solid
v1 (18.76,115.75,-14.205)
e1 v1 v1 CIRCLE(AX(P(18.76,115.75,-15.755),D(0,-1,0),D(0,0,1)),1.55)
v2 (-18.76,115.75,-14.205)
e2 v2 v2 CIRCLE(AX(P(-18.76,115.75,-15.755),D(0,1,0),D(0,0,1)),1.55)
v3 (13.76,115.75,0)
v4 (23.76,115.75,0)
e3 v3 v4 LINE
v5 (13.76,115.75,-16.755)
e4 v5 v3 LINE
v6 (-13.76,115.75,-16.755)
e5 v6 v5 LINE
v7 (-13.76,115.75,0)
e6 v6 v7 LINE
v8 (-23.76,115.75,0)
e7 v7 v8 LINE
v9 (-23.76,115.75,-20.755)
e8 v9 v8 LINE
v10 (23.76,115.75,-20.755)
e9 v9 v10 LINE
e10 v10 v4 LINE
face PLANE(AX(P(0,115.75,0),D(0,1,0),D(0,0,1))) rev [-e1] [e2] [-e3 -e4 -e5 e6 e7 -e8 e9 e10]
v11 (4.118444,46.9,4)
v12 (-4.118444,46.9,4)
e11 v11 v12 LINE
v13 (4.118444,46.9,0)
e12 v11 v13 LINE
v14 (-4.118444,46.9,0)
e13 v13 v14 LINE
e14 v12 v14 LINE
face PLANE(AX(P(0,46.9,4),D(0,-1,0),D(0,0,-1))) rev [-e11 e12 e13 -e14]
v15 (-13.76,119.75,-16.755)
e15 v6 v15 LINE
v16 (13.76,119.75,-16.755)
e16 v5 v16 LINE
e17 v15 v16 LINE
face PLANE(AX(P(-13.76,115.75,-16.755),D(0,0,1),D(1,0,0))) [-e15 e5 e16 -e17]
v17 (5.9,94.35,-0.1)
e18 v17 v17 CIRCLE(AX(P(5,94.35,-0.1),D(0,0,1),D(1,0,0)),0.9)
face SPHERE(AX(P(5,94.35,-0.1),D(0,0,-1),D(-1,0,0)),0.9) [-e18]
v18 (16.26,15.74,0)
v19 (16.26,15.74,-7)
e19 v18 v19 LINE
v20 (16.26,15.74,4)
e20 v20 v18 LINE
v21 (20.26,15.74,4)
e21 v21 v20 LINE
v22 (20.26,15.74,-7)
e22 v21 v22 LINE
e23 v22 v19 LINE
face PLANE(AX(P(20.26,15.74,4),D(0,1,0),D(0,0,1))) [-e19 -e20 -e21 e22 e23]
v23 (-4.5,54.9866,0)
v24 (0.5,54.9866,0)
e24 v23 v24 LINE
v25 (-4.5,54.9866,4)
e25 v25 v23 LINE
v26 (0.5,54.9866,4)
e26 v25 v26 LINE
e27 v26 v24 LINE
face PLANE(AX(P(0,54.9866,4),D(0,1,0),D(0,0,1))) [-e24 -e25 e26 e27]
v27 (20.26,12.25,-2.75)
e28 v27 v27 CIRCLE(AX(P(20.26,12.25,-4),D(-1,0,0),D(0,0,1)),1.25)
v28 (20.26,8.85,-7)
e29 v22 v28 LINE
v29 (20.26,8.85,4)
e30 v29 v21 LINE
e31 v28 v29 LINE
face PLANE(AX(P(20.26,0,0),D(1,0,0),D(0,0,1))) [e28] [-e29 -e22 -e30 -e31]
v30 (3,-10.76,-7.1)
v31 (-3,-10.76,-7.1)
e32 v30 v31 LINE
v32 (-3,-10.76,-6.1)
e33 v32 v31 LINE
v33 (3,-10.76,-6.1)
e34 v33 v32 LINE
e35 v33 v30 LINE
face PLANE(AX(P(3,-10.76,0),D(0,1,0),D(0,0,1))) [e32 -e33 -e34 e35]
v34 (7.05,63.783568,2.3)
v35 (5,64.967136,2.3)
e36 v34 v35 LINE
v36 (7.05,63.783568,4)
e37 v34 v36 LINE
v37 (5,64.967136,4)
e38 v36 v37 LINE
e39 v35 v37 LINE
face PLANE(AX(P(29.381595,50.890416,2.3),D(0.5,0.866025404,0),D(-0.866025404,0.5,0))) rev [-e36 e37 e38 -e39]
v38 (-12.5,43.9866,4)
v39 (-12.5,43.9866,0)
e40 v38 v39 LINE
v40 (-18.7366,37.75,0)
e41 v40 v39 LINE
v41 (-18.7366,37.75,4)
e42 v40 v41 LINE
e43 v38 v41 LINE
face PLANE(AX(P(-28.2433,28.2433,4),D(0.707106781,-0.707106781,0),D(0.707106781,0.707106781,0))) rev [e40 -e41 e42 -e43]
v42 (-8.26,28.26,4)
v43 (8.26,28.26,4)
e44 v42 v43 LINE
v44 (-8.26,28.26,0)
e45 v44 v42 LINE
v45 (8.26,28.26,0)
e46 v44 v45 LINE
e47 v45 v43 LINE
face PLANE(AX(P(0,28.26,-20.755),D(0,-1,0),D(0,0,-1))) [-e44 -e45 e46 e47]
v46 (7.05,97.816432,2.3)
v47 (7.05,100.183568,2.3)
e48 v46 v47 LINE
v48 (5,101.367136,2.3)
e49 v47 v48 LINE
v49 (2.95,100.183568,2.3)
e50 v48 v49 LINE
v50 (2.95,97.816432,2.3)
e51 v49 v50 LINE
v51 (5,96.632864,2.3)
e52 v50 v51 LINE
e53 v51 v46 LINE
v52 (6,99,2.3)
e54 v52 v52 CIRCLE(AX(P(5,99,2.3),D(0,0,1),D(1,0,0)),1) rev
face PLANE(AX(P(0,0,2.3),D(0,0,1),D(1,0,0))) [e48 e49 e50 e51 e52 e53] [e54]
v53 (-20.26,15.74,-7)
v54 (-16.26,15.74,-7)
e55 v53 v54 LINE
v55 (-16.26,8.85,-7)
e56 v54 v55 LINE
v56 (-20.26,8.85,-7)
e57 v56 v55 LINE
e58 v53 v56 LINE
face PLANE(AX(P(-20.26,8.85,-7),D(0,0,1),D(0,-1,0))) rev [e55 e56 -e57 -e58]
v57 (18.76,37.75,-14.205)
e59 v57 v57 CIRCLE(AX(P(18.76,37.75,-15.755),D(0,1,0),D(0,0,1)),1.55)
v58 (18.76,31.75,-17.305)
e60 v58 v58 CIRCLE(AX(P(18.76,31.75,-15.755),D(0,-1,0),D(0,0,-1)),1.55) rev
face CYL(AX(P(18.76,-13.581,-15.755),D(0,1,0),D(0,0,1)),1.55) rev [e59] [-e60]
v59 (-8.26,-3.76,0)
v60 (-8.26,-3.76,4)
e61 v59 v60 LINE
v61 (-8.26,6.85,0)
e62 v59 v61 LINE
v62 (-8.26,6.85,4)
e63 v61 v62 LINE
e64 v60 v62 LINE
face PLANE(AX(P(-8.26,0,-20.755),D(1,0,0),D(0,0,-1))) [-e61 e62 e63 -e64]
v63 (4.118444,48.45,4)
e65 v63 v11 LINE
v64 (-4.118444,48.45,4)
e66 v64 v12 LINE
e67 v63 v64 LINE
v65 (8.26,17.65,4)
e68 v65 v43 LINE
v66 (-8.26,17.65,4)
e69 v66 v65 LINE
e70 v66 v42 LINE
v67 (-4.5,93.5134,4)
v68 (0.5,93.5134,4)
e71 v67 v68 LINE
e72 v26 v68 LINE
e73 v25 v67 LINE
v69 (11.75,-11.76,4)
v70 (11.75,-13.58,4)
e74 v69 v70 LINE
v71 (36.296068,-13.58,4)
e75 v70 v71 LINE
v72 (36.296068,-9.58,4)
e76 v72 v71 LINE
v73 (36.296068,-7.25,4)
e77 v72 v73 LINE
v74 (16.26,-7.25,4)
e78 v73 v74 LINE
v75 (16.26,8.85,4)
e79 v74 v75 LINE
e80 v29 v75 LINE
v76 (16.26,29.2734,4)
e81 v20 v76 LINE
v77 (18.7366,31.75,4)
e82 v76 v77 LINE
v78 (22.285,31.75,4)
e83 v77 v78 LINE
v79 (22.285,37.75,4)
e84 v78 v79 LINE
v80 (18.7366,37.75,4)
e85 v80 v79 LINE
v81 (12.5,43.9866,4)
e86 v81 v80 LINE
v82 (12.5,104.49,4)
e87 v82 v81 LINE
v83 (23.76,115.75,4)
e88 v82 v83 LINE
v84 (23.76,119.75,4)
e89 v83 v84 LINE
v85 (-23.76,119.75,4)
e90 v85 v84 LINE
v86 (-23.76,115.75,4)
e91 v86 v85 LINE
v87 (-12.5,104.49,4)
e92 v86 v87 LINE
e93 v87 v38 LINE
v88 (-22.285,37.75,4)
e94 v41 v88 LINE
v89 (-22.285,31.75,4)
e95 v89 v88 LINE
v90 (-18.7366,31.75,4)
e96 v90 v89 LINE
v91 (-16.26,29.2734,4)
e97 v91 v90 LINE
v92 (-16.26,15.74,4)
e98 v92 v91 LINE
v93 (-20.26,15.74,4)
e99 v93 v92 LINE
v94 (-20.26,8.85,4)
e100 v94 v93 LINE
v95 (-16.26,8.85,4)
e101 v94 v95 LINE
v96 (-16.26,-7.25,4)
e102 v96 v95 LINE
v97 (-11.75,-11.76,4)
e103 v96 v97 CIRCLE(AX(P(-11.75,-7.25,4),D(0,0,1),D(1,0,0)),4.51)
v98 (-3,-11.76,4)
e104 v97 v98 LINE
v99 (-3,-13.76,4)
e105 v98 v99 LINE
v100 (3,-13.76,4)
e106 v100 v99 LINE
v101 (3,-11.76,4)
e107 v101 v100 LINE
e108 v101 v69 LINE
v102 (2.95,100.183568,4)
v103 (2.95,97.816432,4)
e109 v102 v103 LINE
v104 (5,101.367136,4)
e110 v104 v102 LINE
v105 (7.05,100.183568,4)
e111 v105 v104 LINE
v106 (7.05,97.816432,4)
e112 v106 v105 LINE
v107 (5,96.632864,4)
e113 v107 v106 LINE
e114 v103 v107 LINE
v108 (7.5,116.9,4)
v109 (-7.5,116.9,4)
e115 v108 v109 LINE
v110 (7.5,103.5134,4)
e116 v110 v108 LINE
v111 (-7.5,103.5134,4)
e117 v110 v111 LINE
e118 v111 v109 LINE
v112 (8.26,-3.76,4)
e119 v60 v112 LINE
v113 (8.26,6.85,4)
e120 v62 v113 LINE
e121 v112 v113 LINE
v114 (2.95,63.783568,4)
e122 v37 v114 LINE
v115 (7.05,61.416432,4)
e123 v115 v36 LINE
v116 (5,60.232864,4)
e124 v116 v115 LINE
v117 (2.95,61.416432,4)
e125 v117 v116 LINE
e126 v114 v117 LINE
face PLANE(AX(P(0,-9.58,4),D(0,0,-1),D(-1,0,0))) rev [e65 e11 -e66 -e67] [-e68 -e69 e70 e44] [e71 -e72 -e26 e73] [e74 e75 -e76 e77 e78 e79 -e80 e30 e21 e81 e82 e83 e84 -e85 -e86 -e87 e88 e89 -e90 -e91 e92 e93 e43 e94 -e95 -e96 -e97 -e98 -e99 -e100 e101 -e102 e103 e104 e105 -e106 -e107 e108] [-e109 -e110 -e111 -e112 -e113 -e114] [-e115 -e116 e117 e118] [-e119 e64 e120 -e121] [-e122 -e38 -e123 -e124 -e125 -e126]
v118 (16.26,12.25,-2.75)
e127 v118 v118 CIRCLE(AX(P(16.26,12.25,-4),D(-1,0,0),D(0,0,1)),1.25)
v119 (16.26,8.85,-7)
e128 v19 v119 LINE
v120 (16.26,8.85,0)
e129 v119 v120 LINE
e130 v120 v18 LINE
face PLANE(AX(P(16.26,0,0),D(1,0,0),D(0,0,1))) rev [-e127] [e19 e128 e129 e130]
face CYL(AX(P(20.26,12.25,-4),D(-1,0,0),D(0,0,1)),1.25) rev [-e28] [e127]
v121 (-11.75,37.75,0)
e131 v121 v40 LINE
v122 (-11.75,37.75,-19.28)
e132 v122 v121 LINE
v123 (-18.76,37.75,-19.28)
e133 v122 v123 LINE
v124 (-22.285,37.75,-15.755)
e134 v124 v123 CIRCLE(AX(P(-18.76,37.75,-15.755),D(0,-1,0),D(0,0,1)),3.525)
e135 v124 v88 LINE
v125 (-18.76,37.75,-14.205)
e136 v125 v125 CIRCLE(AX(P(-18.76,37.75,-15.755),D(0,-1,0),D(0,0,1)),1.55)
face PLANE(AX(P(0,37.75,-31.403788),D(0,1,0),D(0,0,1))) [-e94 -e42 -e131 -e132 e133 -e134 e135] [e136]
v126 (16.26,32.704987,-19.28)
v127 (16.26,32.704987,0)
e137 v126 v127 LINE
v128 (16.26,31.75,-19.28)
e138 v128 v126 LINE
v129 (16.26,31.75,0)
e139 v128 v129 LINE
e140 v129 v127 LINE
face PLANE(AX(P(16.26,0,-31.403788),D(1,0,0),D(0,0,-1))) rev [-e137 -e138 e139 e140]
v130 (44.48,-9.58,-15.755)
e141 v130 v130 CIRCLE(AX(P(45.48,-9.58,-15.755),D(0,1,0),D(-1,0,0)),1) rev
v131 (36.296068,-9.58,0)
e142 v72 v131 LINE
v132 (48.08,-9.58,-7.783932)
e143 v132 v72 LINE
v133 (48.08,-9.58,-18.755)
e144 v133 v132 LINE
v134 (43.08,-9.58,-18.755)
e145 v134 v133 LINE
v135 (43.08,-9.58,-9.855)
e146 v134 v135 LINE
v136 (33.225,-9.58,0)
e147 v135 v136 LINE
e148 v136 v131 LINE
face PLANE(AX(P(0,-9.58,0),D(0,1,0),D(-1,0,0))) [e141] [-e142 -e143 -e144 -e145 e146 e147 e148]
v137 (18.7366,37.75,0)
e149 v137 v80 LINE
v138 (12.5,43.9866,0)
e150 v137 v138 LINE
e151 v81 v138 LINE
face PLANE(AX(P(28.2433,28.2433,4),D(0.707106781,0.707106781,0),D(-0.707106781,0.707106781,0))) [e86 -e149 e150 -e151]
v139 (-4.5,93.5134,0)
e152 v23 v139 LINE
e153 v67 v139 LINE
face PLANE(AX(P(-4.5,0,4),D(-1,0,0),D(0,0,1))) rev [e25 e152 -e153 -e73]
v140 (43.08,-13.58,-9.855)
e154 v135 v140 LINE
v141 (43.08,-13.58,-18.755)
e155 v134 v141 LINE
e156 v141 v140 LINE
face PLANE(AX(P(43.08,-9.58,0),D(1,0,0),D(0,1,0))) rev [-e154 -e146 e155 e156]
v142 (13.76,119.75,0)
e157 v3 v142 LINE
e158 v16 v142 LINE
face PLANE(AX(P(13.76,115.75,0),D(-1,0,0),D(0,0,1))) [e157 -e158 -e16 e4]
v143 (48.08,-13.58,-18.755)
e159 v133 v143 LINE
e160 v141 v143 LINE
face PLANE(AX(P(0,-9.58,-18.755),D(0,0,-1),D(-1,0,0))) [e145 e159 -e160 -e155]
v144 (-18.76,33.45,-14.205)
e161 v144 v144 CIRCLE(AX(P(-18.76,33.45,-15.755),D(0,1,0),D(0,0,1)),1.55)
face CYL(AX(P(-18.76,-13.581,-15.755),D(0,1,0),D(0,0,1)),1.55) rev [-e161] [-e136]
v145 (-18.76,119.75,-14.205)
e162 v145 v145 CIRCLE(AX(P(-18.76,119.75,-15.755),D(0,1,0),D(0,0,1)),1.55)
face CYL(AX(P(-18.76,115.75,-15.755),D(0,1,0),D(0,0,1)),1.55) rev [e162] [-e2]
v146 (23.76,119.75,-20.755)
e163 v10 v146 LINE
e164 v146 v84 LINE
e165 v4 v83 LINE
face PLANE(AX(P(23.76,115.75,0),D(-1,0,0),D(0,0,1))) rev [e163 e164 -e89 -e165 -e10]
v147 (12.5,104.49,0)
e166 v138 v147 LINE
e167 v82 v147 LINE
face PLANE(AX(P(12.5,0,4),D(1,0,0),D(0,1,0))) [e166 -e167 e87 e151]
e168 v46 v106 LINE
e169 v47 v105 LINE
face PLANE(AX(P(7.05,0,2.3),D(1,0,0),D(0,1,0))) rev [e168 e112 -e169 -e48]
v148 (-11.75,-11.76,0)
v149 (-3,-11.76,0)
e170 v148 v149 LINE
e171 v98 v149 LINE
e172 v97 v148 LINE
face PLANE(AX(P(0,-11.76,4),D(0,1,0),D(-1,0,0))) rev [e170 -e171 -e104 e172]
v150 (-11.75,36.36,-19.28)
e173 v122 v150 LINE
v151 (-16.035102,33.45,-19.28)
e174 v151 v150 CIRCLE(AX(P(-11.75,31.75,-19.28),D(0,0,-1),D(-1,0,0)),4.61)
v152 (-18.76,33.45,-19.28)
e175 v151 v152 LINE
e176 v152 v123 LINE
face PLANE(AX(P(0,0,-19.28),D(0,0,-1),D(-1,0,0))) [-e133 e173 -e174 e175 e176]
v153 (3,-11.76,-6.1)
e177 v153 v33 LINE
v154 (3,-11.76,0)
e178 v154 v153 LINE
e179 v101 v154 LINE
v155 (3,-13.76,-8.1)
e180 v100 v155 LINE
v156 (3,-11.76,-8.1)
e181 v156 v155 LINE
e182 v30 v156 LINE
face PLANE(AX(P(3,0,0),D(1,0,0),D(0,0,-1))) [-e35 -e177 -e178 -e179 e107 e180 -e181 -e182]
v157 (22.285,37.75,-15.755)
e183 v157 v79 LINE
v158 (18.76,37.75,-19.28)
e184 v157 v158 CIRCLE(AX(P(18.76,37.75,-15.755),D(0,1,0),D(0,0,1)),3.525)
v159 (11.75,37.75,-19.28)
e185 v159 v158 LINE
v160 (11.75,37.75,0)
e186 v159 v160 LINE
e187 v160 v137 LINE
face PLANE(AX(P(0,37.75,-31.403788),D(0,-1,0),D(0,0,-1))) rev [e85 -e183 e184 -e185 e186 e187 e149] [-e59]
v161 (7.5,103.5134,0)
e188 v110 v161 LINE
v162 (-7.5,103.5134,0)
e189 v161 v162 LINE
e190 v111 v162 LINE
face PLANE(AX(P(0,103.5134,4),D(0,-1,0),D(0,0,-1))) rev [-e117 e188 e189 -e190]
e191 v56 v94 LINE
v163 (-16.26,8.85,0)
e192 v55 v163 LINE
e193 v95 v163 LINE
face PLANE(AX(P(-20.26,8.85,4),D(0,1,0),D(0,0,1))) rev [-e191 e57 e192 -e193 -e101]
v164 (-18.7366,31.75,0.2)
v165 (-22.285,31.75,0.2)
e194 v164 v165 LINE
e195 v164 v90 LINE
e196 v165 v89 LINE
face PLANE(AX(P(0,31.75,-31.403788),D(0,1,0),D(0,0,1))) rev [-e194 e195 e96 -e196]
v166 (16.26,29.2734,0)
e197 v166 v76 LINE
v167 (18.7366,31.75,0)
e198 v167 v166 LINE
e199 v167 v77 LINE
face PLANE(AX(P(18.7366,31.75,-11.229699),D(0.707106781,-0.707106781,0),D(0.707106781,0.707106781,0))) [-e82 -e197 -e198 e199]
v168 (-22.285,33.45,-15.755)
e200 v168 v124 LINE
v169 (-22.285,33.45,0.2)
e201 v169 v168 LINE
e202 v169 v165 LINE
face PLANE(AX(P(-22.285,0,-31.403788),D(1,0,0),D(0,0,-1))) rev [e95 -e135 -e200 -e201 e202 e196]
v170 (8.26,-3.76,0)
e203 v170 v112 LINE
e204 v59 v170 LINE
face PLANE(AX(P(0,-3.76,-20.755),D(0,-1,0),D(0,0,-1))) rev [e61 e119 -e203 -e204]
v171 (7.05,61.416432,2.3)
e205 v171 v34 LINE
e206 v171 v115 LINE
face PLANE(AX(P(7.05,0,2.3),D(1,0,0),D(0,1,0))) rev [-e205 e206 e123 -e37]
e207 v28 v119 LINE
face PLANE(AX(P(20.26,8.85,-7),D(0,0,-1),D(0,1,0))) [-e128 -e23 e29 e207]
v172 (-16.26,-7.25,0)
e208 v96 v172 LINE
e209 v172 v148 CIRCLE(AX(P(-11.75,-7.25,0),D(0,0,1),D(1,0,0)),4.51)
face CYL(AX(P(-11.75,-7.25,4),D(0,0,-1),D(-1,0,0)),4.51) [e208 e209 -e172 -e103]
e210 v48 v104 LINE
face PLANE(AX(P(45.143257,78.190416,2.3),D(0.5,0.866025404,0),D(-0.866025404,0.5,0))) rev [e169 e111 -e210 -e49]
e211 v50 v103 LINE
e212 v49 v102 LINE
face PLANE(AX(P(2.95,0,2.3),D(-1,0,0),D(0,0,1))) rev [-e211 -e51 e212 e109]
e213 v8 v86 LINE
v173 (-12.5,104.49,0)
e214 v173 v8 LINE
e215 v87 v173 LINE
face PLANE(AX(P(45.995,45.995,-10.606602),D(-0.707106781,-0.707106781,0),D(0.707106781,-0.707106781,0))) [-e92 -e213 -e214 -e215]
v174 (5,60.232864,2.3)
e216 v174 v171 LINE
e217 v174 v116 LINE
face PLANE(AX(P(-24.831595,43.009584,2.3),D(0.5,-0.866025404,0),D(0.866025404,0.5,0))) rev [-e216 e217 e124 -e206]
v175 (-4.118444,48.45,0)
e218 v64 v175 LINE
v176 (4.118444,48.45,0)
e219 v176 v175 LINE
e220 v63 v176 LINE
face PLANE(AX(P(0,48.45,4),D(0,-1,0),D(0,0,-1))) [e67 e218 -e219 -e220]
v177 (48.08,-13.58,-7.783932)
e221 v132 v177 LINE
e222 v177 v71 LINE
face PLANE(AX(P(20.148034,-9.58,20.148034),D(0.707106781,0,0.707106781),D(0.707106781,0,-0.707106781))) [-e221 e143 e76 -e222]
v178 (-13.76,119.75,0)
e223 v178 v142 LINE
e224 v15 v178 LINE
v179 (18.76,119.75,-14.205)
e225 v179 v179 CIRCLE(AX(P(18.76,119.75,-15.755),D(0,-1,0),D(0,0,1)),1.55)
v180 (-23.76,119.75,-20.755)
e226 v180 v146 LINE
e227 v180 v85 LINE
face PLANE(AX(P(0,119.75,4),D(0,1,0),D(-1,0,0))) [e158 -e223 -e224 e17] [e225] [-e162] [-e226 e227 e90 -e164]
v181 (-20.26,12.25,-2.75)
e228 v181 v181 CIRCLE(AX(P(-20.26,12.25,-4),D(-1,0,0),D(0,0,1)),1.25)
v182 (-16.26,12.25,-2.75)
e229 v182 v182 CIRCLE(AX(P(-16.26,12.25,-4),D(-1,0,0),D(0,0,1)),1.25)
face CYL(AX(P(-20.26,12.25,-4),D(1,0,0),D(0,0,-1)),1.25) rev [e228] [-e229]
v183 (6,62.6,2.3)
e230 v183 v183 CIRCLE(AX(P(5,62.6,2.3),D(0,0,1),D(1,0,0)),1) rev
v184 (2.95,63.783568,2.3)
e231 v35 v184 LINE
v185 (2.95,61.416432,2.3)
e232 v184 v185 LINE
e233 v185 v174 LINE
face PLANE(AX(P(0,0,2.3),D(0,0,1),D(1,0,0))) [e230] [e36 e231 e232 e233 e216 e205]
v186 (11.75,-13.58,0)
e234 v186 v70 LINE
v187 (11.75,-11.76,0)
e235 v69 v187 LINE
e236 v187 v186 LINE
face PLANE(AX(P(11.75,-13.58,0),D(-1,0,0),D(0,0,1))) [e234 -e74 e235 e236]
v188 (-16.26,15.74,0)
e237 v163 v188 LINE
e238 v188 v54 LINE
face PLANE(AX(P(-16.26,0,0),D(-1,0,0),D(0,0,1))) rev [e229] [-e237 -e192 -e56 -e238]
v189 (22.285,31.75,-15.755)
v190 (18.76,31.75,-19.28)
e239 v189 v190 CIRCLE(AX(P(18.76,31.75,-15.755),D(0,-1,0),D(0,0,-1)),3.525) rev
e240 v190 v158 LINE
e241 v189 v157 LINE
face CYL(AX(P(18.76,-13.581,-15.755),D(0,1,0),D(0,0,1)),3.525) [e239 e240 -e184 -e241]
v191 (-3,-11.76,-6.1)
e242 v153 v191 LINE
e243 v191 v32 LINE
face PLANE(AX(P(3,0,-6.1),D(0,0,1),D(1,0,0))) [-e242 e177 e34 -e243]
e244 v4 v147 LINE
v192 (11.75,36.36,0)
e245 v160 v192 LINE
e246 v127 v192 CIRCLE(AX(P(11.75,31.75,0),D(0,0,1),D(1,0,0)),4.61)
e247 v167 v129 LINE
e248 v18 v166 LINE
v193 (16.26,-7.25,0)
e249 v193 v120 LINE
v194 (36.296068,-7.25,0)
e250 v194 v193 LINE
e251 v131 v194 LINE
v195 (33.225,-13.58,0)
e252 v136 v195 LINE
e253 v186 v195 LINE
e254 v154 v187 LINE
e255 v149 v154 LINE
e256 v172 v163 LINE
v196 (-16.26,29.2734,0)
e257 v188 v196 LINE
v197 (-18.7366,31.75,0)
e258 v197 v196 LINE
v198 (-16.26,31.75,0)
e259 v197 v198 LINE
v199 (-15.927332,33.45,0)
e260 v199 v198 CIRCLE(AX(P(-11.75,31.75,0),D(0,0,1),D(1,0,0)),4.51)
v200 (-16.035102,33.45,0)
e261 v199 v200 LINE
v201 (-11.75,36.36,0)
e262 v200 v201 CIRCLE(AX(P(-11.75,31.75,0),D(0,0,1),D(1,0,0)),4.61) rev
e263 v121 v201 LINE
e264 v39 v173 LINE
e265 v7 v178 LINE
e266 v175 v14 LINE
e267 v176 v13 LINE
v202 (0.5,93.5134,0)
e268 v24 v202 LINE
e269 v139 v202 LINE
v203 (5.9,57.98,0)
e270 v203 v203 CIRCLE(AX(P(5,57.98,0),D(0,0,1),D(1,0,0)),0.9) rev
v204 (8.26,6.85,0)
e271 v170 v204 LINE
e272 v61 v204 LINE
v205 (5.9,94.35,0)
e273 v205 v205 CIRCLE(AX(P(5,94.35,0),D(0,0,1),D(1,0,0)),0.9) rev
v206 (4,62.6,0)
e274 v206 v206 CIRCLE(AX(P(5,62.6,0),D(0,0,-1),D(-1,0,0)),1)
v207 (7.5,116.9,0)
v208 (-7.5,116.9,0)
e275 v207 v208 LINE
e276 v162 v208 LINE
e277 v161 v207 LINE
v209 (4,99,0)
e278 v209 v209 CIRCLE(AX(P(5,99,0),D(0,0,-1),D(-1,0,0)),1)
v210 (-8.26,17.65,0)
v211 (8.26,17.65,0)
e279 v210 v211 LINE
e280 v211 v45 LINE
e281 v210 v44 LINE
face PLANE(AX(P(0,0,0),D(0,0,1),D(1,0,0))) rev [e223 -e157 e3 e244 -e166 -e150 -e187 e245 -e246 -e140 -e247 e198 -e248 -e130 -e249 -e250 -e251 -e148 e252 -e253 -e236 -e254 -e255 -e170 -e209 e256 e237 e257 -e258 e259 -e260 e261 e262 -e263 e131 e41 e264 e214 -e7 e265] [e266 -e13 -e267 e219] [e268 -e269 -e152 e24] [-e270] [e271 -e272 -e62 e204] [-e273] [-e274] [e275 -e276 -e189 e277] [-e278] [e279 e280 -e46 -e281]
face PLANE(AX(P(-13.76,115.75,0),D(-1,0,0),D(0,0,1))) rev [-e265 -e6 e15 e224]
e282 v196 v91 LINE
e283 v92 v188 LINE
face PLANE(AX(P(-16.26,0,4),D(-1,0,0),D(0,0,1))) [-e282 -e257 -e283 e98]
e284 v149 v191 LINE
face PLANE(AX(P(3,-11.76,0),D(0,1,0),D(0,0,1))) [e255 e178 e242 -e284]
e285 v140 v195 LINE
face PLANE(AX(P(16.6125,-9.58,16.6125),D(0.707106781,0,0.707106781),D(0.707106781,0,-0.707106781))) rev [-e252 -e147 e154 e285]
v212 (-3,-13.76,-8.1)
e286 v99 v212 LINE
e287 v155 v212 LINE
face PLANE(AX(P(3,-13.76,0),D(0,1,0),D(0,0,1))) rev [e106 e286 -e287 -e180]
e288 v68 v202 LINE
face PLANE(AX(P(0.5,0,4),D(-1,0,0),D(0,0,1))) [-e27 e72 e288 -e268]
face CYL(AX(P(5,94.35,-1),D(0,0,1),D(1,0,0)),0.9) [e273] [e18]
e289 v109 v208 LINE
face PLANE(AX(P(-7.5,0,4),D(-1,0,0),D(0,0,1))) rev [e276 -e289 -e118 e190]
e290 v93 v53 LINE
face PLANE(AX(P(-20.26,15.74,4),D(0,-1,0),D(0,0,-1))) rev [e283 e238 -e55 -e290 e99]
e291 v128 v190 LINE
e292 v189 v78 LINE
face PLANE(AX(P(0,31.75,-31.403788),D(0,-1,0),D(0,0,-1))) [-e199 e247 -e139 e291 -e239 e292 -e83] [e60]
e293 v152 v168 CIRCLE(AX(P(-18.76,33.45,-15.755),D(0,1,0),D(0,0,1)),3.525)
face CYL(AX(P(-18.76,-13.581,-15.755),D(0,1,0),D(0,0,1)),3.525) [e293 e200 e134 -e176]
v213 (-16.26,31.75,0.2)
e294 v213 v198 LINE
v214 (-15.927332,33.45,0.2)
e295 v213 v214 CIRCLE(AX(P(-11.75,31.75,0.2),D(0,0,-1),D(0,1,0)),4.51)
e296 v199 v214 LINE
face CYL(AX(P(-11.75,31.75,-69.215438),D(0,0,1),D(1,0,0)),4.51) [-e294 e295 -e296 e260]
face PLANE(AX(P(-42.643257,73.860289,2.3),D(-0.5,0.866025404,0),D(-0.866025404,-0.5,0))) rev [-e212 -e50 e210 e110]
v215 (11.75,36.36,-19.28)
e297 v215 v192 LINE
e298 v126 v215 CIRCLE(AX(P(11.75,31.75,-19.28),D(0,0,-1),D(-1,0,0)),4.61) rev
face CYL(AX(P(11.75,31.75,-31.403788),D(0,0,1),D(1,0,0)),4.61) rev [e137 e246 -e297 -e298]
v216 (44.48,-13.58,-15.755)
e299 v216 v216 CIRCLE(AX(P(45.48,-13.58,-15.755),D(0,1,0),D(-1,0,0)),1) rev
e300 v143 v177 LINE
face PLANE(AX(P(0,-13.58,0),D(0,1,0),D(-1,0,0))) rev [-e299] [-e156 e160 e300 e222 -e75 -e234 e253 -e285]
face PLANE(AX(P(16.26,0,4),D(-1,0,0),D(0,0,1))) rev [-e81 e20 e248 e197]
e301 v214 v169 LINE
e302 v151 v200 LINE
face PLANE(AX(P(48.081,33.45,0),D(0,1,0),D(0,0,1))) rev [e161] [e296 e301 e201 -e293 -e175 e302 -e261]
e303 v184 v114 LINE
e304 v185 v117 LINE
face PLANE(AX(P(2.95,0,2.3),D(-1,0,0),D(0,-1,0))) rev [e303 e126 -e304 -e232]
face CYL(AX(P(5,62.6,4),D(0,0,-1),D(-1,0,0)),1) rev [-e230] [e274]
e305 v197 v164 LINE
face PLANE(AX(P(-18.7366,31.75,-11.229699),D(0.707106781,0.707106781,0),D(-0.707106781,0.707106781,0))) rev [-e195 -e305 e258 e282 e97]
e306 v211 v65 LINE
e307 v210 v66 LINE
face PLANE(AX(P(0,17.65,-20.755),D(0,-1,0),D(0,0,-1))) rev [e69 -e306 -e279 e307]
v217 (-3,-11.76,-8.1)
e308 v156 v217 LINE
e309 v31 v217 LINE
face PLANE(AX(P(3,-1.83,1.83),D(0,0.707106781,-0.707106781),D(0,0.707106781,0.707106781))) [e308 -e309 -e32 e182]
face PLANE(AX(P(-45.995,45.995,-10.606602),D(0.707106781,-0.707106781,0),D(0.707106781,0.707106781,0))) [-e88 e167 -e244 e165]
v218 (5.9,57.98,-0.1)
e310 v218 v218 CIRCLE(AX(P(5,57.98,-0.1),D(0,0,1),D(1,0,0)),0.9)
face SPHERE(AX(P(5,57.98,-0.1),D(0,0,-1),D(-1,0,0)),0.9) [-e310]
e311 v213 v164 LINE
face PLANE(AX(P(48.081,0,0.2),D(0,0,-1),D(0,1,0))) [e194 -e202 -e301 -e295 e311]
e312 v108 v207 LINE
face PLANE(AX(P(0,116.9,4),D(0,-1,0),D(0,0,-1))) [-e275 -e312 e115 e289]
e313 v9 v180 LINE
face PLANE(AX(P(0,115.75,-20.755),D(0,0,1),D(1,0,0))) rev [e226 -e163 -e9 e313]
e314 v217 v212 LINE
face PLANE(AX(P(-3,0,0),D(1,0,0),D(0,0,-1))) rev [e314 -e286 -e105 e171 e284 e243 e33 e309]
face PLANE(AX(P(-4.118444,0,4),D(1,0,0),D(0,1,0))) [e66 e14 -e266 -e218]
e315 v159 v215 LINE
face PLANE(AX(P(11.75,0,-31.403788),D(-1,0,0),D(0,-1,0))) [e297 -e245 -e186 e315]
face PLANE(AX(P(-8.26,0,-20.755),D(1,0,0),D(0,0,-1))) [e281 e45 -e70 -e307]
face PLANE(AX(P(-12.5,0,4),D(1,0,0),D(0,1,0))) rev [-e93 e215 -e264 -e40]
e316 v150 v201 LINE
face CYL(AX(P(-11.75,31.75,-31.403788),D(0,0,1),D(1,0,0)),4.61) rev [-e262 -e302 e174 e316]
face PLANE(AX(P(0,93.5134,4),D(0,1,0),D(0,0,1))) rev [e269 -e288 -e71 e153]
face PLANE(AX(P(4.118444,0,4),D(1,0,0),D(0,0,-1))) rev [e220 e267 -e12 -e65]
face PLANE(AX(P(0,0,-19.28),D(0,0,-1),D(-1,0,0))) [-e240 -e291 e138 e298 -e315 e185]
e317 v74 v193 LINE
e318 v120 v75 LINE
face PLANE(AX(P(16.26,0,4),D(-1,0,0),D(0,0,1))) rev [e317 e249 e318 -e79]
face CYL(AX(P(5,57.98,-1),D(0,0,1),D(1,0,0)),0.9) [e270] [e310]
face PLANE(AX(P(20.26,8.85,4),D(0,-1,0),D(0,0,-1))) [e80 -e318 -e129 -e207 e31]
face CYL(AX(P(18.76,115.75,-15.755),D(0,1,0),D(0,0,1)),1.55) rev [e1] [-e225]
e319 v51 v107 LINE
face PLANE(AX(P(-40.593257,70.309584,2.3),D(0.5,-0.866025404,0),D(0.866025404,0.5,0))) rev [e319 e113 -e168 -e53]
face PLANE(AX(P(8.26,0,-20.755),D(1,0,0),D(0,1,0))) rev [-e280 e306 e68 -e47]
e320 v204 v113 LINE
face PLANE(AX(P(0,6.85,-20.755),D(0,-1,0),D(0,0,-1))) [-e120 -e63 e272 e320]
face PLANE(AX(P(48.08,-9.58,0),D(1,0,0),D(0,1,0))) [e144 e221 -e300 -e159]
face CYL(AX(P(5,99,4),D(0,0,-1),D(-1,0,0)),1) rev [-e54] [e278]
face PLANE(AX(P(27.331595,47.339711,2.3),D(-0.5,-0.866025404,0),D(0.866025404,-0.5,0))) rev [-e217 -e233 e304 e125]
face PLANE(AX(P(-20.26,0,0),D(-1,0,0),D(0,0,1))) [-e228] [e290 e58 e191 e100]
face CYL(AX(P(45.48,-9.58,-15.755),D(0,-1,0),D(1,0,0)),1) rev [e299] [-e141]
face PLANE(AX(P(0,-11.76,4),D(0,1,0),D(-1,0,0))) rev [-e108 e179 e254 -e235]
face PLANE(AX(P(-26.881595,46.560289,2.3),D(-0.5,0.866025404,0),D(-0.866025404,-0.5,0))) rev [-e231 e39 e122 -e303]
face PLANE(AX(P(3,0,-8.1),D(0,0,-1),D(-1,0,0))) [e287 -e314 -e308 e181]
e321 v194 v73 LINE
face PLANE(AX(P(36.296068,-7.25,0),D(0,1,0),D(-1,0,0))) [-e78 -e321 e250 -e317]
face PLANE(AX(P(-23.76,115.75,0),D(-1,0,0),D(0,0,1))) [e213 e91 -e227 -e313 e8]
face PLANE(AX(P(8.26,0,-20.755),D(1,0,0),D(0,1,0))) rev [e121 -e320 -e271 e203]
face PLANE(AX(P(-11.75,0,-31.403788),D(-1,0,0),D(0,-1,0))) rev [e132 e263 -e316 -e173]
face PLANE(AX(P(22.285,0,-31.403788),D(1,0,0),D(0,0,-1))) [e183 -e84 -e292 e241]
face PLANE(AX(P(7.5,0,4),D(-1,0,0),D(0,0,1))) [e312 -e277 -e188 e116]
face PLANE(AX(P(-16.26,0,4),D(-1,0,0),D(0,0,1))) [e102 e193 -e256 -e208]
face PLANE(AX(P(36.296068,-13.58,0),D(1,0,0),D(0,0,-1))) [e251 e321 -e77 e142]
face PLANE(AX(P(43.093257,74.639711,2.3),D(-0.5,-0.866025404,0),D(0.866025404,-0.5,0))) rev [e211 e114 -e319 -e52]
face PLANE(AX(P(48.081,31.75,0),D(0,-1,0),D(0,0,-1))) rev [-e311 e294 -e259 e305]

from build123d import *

# Parameters (mm, degrees)
EXTRUDE_1_DEPTH     = 4
SKETCH_2_W          = 15
SKETCH_2_H          = 13.3866
CUT_EXTRUDE_1_DEPTH = 121.91505324
SKETCH_3_W          = 10
SKETCH_3_H          = 10
SKETCH_3_R          = 1.55
SKETCH_3_H_2        = 14.755
EXTRUDE_2_DEPTH     = 4
EXTRUDE_3_DEPTH     = 4
EXTRUDE_4_DEPTH     = 4
SKETCH_7_W          = 27.52
SKETCH_7_H          = 4
EXTRUDE_5_DEPTH     = 4
SKETCH_8_W          = 24.546067812
SKETCH_8_H          = 6.33
EXTRUDE_6_DEPTH     = 4
SKETCH_11_W         = 16.52
SKETCH_11_H         = 10.61
CUT_EXTRUDE_2_DEPTH = 132.394668556
SKETCH_12_W         = 11
SKETCH_12_H         = 6.89
SKETCH_12_R         = 1.25
EXTRUDE_6711_DEPTH  = 4
SKETCH_14_R         = 1
CUT_EXTRUDE_3_DEPTH = 131.700110654
SKETCH_15_R         = 0.9
EXTRUDE_9_DEPTH     = 1
FILLET_1_R          = 0.9
CUT_EXTRUDE_START   = -1.7
SKETCH_16_R         = 1
CUT_EXTRUDE_4_DEPTH = 1.7
CUT_EXTRUDE_5_DEPTH = 131.700110654
SKETCH_19_W         = 5
SKETCH_19_H         = 38.5268
SKETCH_19_W_2       = 8.236887868
SKETCH_19_H_2       = 1.55
CUT_EXTRUDE_6_DEPTH = 131.700110654
EXTRUDE_12_DEPTH    = 23.28
CUT_EXTRUDE_7_REACH = 99.296
SKETCH_23_R         = 1.55
EXTRUDE_13_DEPTH    = 4
CUT_EXTRUDE_START_2 = -19.28
CUT_EXTRUDE_8_DEPTH = 19.48
SKETCH_26_W         = 10.1
SKETCH_26_H         = 2
EXTRUDE_14_DEPTH    = 3


# Read off the part's stored shape, not the designer's step: 切除-拉伸8
with BuildPart() as part:
    # 草图1 → 凸台-拉伸1 (new body)
    with BuildSketch(Plane.XY):
        with BuildLine():
            Line((-16.26, -7.25), (-16.26, 119.75))
            Line((-16.26, 119.75), (16.26, 119.75))
            Line((16.26, 119.75), (16.26, -7.25))
            ThreePointArc((16.26, -7.25), (14.939051583, -10.439051583), (11.75, -11.76))
            Line((11.75, -11.76), (-11.75, -11.76))
            ThreePointArc((-11.75, -11.76), (-14.939051583, -10.439051583), (-16.26, -7.25))
        make_face()
    extrude(amount=EXTRUDE_1_DEPTH)

    # 草图2 → 切除-拉伸1 (cut, through all)
    with BuildSketch(Plane(origin=(0, 0, 0), x_dir=(-1, 0, 0), z_dir=(0, 0, -1))):
        with Locations((0, 110.2067)):
            Rectangle(SKETCH_2_W, SKETCH_2_H)
    extrude(amount=-CUT_EXTRUDE_1_DEPTH, mode=Mode.SUBTRACT)

    # 草图3 → 凸台-拉伸2 (add)
    # profile 1 of 2: a face of its own
    with BuildSketch(Plane(origin=(0, 119.75, 0), x_dir=(1, 0, 0), z_dir=(0, 1, 0))):
        with Locations((-18.76, 15.755)):
            Rectangle(SKETCH_3_W, SKETCH_3_H)
        with Locations(Location((-18.76, 15.755, 0), (0, 0, 270))):
            Circle(SKETCH_3_R, mode=Mode.SUBTRACT)
    # profile 2 of 2: a face of its own
    with BuildSketch(Plane(origin=(0, 119.75, 0), x_dir=(1, 0, 0), z_dir=(0, 1, 0))):
        with Locations((-18.76, 3.3775)):
            Rectangle(SKETCH_3_W, SKETCH_3_H_2)
    extrude_2 = extrude(amount=-EXTRUDE_2_DEPTH)

    # 镜向1: 凸台-拉伸2 across plane
    add(extrude_2.mirror(Plane(origin=(0, 0, 0), x_dir=(0, 0, 1), z_dir=(1, 0, 0))))

    # 草图6 → 凸台-拉伸4 (add)
    with BuildSketch(Plane.XY.offset(4)):
        Polygon((-16.26, 115.75), (-23.76, 115.75), (-16.26, 108.25), align=None)
        Polygon((16.26, 115.75), (16.26, 108.25), (23.76, 115.75), align=None)
    extrude(amount=-EXTRUDE_4_DEPTH)

    # 草图7 → 凸台-拉伸5 (add)
    with BuildSketch(Plane(origin=(0, 119.75, 0), x_dir=(1, 0, 0), z_dir=(0, 1, 0))):
        with Locations((0, 18.755)):
            Rectangle(SKETCH_7_W, SKETCH_7_H)
    extrude(amount=-EXTRUDE_5_DEPTH)



with BuildPart() as body_2:
    # 草图5 → 凸台-拉伸3 (new body)
    with BuildSketch(Plane(origin=(0, -13.58, 0), x_dir=(1, 0, 0), z_dir=(0, 1, 0))):
        Polygon((47.78, 9.855), (43.08, 9.855), (29.225, -4), (36.296067812, -4), (48.08, 7.783932188), (48.08, 9.855), align=None)
        with BuildLine():
            Line((47.78, 18.755), (43.08, 18.755))
            Line((43.08, 18.755), (43.08, 9.855))
            Line((43.08, 9.855), (47.78, 9.855))
            Line((47.78, 9.855), (47.78, 15.105))
            Line((47.78, 15.105), (46.239934208, 15.105))
            ThreePointArc((46.239934208, 15.105), (44.48, 15.755), (46.239934208, 16.405))
            Line((46.239934208, 16.405), (47.78, 16.405))
            Line((47.78, 16.405), (47.78, 18.755))
        make_face()
        with BuildLine():
            Line((48.08, 18.755), (47.78, 18.755))
            Line((47.78, 18.755), (47.78, 16.405))
            Line((47.78, 16.405), (46.239934208, 16.405))
            ThreePointArc((46.239934208, 16.405), (46.418065618, 16.10145764), (46.48, 15.755))
            ThreePointArc((46.48, 15.755), (46.418065618, 15.40854236), (46.239934208, 15.105))
            Line((46.239934208, 15.105), (47.78, 15.105))
            Line((47.78, 15.105), (47.78, 9.855))
            Line((47.78, 9.855), (48.08, 9.855))
            Line((48.08, 9.855), (48.08, 18.755))
        make_face()
    extrude(amount=EXTRUDE_3_DEPTH)


with BuildPart() as part_1:
    add(part.part)

    add(body_2.part)  # 凸台-拉伸6 merges body 2
    # 草图8 → 凸台-拉伸6 (add)
    with BuildSketch(Plane.XY.offset(4)):
        with Locations((24.023033906, -10.415)):
            Rectangle(SKETCH_8_W, SKETCH_8_H)
    extrude(amount=-EXTRUDE_6_DEPTH)

    # 草图11 → 切除-拉伸2 (cut, through all)
    with BuildSketch(Plane.XY.offset(4)):
        with Locations((0, 1.545)):
            Rectangle(SKETCH_11_W, SKETCH_11_H)
        with Locations((0, 22.955)):
            Rectangle(SKETCH_11_W, SKETCH_11_H)
    extrude(amount=-CUT_EXTRUDE_2_DEPTH, mode=Mode.SUBTRACT)

    # 草图12 → Extrude 6711 (add)
    with BuildSketch(Plane.ZY.offset(16.26)):
        with Locations((-1.5, 12.295)):
            Rectangle(SKETCH_12_W, SKETCH_12_H)
        with Locations((-4, 12.25)):
            Circle(SKETCH_12_R, mode=Mode.SUBTRACT)
    extrude_6711 = extrude(amount=EXTRUDE_6711_DEPTH)

    # 镜向4: Extrude 6711 across plane
    add(extrude_6711.mirror(Plane(origin=(0, 0, 0), x_dir=(0, 0, 1), z_dir=(1, 0, 0))))

    # 草图14 → 切除-拉伸3 (cut, through all)
    with BuildSketch(Plane(origin=(0, 0, 0), x_dir=(-1, 0, 0), z_dir=(0, 0, -1))):
        with Locations((-5, 62.6)):
            Circle(SKETCH_14_R)
        with Locations((-5, 99)):
            Circle(SKETCH_14_R)
    extrude(amount=-CUT_EXTRUDE_3_DEPTH, mode=Mode.SUBTRACT)

    # 草图15 → 凸台-拉伸9 (add)
    with BuildSketch(Plane(origin=(0, 0, 0), x_dir=(-1, 0, 0), z_dir=(0, 0, -1))):
        with Locations(Location((-5, 94.35, 0), (0, 0, 180))):
            Circle(SKETCH_15_R)
        with Locations(Location((-5, 57.98, 0), (0, 0, 180))):
            Circle(SKETCH_15_R)
    extrude(amount=EXTRUDE_9_DEPTH)

    # 圆角1
    fillet_1_edges = [part_1.edges().sort_by_distance(p)[0] for p in [
        (4.1, 94.35, -1),
        (4.1, 57.98, -1),
    ]]
    fillet(fillet_1_edges, radius=FILLET_1_R)

    # 草图16 → 切除-拉伸4 (cut)
    # profile 1 of 2: a face of its own
    with BuildSketch(Plane.XY.offset(4).offset(CUT_EXTRUDE_START)):
        Polygon((7.05, 61.416431948), (7.05, 63.783568052), (5, 64.967136104), (2.95, 63.783568052), (2.95, 61.416431948), (5, 60.232863896), align=None)
        with Locations(Location((5, 62.6, 0), (0, 0, 180))):
            Circle(SKETCH_16_R, mode=Mode.SUBTRACT)
    # profile 2 of 2: a face of its own
    with BuildSketch(Plane.XY.offset(4).offset(CUT_EXTRUDE_START)):
        Polygon((2.95, 97.816431948), (5, 96.632863896), (7.05, 97.816431948), (7.05, 100.183568052), (5, 101.367136104), (2.95, 100.183568052), align=None)
        with Locations(Location((5, 99, 0), (0, 0, 180))):
            Circle(SKETCH_16_R, mode=Mode.SUBTRACT)
    extrude(amount=CUT_EXTRUDE_4_DEPTH, mode=Mode.SUBTRACT)

    # 草图17 → 切除-拉伸5 (cut, symmetric)
    with BuildSketch(Plane(origin=(0, 0, 0), x_dir=(-1, 0, 0), z_dir=(0, 0, -1))):
        Polygon((-12.5, 104.49), (-16.26, 108.25), (-16.26, 40.2266), (-12.5, 43.9866), align=None)
    cut_extrude_5 = extrude(amount=CUT_EXTRUDE_5_DEPTH, both=True, mode=Mode.SUBTRACT)

    # 镜向2: 切除-拉伸5 across plane
    add(cut_extrude_5.mirror(Plane(origin=(0, 0, 0), x_dir=(0, 0, 1), z_dir=(1, 0, 0))), mode=Mode.SUBTRACT)

    # 草图19 → 切除-拉伸6 (cut, through all)
    with BuildSketch(Plane(origin=(0, 0, 0), x_dir=(-1, 0, 0), z_dir=(0, 0, -1))):
        with Locations((2, 74.25)):
            Rectangle(SKETCH_19_W, SKETCH_19_H)
        with Locations((0, 47.675)):
            Rectangle(SKETCH_19_W_2, SKETCH_19_H_2)
    extrude(amount=-CUT_EXTRUDE_6_DEPTH, mode=Mode.SUBTRACT)

    # 草图22 → 凸台-拉伸12 (add)
    with BuildSketch(Plane.XY.offset(4)):
        with BuildLine():
            Line((16.26, 32.704986911), (16.26, 31.75))
            Line((16.26, 31.75), (22.285, 31.75))
            Line((22.285, 31.75), (22.285, 37.75))
            Line((22.285, 37.75), (11.75, 37.75))
            Line((11.75, 37.75), (11.75, 36.36))
            ThreePointArc((11.75, 36.36), (14.652551493, 35.331521301), (16.26, 32.704986911))
        make_face()
    extrude_12 = extrude(amount=-EXTRUDE_12_DEPTH)

    # 草图23 → 切除-拉伸7 (cut, up to next)
    with BuildSketch(Plane(origin=(0, 37.75, 0), x_dir=(1, 0, 0), z_dir=(0, 1, 0)), mode=Mode.PRIVATE) as cut_extrude_7_sk1:
        with Locations(Location((18.76, 15.755, 0), (0, 0, 270))):
            Circle(SKETCH_23_R)
    cut_extrude_7_tool1 = extrude(cut_extrude_7_sk1.sketch, amount=-CUT_EXTRUDE_7_REACH, mode=Mode.PRIVATE) & part_1.part
    # 草图23 → 切除-拉伸7 (cut, up to next)
    with BuildSketch(Plane(origin=(0, 37.75, 0), x_dir=(1, 0, 0), z_dir=(0, 1, 0)), mode=Mode.PRIVATE) as cut_extrude_7_sk2:
        with BuildLine():
            ThreePointArc((18.76, 19.28), (21.252551404, 18.247551404), (22.285, 15.755))
            Line((22.285, 15.755), (22.285, 19.28))
            Line((22.285, 19.28), (18.76, 19.28))
        make_face()
    cut_extrude_7_tool2 = extrude(cut_extrude_7_sk2.sketch, amount=-CUT_EXTRUDE_7_REACH, mode=Mode.PRIVATE) & part_1.part
    cut_extrude_7_1 = cut_extrude_7_tool1.solids().sort_by_distance((18.76, 37.75, -15.755))[0]
    add(cut_extrude_7_1, mode=Mode.SUBTRACT)
    cut_extrude_7_2 = cut_extrude_7_tool2.solids().sort_by_distance((21.497628, 37.75, -18.492628))[0]
    add(cut_extrude_7_2, mode=Mode.SUBTRACT)
    cut_extrude_7 = cut_extrude_7_1 + cut_extrude_7_2  # 切除-拉伸7 as one shape, for the pattern or mirror that repeats it

    # 草图24 → 凸台-拉伸13 (add)
    with BuildSketch(Plane.XY.offset(4)):
        Polygon((16.26, 40.2266), (18.7366, 37.75), (18.7366, 31.75), (16.26, 29.2734), align=None)
    extrude_13 = extrude(amount=-EXTRUDE_13_DEPTH)

    # 镜向3: 凸台-拉伸12, 切除-拉伸7, 凸台-拉伸13 across plane
    add(extrude_12.mirror(Plane(origin=(0, 0, 0), x_dir=(0, 0, 1), z_dir=(1, 0, 0))))
    add(cut_extrude_7.mirror(Plane(origin=(0, 0, 0), x_dir=(0, 0, 1), z_dir=(1, 0, 0))), mode=Mode.SUBTRACT)
    add(extrude_13.mirror(Plane(origin=(0, 0, 0), x_dir=(0, 0, 1), z_dir=(1, 0, 0))))

    # 切除-拉伸8 outline → 切除-拉伸8 (cut)
    with BuildSketch(Plane.XY.offset(CUT_EXTRUDE_START_2)):
        with BuildLine():
            ThreePointArc((-16.26, 31.75), (-16.176051621, 32.616121846), (-15.927331684, 33.45))
            Line((-15.927331684, 33.45), (-22.285, 33.45))
            Line((-22.285, 33.45), (-22.285, 31.75))
            Line((-22.285, 31.75), (-16.26, 31.75))
        make_face()
    extrude(amount=CUT_EXTRUDE_8_DEPTH, mode=Mode.SUBTRACT)

    # 草图26 → 凸台-拉伸14 (add, symmetric)
    with BuildSketch(Plane(origin=(0, 0, 0), x_dir=(0, 0, -1), z_dir=(1, 0, 0))):
        with Locations((1.05, -12.76)):
            Rectangle(SKETCH_26_W, SKETCH_26_H)
        Polygon((8.1, -11.76), (8.1, -13.76), (6.1, -13.76), (6.1, -11.76), (6.1, -10.76), (7.1, -10.76), align=None)
    extrude(amount=EXTRUDE_14_DEPTH, both=True)


solid = part_1.part
